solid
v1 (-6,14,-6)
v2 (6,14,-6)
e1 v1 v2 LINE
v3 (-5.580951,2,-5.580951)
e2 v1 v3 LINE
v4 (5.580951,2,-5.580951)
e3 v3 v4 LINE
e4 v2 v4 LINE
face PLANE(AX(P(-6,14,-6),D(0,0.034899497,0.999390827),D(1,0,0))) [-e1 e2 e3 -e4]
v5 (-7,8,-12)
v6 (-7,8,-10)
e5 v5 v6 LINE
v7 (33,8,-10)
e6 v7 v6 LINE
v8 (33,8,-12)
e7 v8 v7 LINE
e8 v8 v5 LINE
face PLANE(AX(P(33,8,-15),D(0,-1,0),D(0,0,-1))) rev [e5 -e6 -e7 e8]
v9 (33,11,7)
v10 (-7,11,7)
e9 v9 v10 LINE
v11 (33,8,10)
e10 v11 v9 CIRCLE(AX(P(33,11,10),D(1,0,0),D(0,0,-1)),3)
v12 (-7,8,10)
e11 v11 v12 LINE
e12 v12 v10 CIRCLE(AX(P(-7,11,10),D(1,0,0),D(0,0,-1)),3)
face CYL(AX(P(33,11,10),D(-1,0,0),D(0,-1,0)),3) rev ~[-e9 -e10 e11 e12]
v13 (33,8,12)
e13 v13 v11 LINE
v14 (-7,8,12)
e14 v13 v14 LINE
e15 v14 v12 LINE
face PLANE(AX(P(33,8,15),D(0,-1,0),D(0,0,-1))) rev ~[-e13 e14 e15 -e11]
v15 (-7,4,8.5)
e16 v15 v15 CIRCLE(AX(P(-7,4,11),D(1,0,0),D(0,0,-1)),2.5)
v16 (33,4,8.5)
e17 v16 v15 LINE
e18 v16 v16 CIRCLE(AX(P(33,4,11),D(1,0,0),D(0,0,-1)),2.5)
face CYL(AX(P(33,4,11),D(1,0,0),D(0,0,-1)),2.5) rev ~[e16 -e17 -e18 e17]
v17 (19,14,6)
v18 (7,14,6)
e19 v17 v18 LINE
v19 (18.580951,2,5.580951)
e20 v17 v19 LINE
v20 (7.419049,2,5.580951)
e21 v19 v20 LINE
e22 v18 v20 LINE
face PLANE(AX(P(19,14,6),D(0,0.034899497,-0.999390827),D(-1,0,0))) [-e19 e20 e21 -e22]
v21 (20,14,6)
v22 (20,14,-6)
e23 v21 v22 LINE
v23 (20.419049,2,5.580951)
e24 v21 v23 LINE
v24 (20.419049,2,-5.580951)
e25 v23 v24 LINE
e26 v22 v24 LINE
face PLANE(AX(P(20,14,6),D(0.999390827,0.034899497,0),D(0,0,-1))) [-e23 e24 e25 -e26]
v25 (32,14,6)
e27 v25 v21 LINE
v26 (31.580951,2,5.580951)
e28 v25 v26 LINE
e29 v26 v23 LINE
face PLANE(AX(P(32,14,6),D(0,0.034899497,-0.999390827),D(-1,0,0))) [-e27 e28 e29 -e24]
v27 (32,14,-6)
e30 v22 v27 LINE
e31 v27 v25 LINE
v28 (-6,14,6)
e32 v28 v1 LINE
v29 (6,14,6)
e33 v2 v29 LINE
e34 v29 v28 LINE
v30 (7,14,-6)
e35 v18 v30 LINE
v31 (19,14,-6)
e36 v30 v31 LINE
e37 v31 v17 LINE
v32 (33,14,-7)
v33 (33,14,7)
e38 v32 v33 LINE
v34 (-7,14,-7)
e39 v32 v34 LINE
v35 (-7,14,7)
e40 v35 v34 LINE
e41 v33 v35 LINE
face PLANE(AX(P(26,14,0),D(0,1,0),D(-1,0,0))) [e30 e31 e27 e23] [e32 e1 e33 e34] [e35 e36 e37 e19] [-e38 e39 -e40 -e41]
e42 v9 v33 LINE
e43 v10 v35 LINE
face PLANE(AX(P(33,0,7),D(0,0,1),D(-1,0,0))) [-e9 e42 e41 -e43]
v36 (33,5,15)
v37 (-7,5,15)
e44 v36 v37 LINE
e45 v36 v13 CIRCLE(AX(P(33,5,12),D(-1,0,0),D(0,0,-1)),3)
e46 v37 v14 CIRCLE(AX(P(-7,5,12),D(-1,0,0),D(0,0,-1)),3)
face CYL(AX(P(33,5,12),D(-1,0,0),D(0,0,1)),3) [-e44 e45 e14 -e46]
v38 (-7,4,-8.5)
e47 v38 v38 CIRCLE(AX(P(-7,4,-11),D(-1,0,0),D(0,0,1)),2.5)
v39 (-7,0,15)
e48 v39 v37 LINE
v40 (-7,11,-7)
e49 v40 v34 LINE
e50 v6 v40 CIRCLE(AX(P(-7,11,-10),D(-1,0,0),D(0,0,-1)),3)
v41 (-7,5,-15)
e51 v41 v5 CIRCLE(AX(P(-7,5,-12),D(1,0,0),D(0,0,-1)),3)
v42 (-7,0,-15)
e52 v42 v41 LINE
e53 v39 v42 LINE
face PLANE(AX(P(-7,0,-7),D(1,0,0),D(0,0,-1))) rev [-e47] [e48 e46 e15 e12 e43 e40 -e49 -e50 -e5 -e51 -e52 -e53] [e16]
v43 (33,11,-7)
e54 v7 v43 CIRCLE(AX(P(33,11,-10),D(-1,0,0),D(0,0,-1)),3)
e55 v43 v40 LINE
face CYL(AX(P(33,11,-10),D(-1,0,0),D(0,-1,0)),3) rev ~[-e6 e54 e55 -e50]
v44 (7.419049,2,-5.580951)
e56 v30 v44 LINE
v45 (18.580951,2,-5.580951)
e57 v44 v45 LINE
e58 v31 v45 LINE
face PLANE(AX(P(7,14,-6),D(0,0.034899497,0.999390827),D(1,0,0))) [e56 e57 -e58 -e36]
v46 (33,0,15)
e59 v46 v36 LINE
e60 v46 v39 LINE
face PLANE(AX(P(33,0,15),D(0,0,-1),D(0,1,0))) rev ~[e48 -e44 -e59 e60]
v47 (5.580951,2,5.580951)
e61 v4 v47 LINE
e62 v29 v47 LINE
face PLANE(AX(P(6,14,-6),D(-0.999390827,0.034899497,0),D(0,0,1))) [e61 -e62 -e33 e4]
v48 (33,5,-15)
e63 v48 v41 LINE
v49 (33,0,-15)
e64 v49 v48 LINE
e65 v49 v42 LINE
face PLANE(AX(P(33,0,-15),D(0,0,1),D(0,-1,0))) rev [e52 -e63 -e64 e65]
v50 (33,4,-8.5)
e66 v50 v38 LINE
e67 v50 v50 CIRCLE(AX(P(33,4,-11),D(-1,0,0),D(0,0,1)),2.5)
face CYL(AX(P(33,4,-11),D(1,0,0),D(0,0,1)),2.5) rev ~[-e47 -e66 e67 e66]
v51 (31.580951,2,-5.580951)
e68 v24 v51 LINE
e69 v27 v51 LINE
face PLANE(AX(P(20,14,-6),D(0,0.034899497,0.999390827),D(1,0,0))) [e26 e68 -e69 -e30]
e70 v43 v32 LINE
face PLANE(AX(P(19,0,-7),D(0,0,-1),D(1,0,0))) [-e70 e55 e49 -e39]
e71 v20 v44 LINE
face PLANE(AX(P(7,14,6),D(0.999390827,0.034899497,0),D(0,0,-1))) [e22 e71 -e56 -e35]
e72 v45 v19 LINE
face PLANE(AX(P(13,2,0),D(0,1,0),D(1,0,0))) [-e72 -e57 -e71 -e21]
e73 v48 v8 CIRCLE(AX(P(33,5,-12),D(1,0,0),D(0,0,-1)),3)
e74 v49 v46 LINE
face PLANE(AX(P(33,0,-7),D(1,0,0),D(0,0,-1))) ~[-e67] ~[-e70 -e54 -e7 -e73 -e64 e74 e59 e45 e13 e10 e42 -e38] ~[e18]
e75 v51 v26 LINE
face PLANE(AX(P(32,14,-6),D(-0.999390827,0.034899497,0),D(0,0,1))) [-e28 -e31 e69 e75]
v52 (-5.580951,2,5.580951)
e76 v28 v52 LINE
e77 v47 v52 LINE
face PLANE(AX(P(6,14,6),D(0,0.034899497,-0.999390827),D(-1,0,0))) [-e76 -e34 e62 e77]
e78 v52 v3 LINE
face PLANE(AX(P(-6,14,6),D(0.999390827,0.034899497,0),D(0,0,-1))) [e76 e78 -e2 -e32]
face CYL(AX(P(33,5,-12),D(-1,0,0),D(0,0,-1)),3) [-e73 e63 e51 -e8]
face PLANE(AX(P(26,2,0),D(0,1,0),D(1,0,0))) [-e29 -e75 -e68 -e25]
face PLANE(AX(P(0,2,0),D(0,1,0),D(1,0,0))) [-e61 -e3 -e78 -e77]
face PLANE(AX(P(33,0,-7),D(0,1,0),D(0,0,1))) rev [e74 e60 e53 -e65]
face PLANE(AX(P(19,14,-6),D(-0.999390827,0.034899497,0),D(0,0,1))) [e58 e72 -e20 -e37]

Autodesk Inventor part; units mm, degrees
ref_plane "YZ Plane" through (0, 0, 0) normal (1, 0, 0) x (0, 1, 0)
ref_plane "XZ Plane" through (0, 0, 0) normal (0, 1, 0) x (-1, 0, 0)
ref_plane "XY Plane" through (0, 0, 0) normal (0, 0, 1) x (1, 0, 0)
sketch "Sketch1" plane through (0, 0, 0) normal (0, 1, 0) x (-1, 0, 0)
  line L0 (-7, 7) -> (7, 7)
  line L1 (7, 7) -> (7, -7)
  line L2 (7, -7) -> (-7, -7)
  line L3 (-7, -7) -> (-7, 7)
  line L4 (-7, 7) -> (7, -7) construction
  line L5 (7, 7) -> (-7, -7) construction
  point P0 (0, 0)
  dimension "d0" = 14
  dimension "d1" = 14
extrude "Extrusion1" add sketch "Sketch1" along normal blind 14
sketch "Sketch2" plane through (0, 14, 0) normal (0, 1, 0) x (1, 0, 0)
  line L0 (6, -6) -> (-6, -6)
  line L1 (-6, -6) -> (-6, 6)
  line L2 (-6, 6) -> (6, 6)
  line L3 (6, 6) -> (6, -6)
  line L4 (6, -6) -> (-6, 6) construction
  line L5 (-6, -6) -> (6, 6) construction
  point P0 (0, 0)
  dimension "d4" = 12
  dimension "d5" = 12
extrude "Extrusion2" cut sketch "Sketch2" against normal blind 12 draft -2
pattern_linear "Rectangular Pattern1" count 3 spacing 13 along (1, 0, 0) of "Extrusion2", "Extrusion1"
sketch "Sketch3" plane through (33, 0, 7) normal (1, 0, 0) x (0, 0, -1)
  line L0 (0, 0) -> (0, 14) projected
  line L1 (0, 0) -> (-8, 0)
  line L2 (-8, 0) -> (-8, 8)
  line L3 (-8, 8) -> (0, 8)
  line L4 (0, 8) -> (0, 0)
  line L5 (-4, 8) -> (-4, 0) construction
  circle A0 centre (-4, 4) radius 2.5
  point P0 (7, 0)
  dimension "d11" = 8
  dimension "d12" = 8
  dimension "d13" = 5
extrude "Extrusion3" add sketch "Sketch3" against normal up to surface (40 mm away)
fillet "Fillet1" radius 3 2 edges at (13, 8, 15) (13, 8, 7)
mirror "Mirror1" about plane through (0, 0, 0) normal (0, 0, 1) of "Fillet1", "Extrusion3"
fillet_without_effect "Fillet2"
properties part number "Mould"
